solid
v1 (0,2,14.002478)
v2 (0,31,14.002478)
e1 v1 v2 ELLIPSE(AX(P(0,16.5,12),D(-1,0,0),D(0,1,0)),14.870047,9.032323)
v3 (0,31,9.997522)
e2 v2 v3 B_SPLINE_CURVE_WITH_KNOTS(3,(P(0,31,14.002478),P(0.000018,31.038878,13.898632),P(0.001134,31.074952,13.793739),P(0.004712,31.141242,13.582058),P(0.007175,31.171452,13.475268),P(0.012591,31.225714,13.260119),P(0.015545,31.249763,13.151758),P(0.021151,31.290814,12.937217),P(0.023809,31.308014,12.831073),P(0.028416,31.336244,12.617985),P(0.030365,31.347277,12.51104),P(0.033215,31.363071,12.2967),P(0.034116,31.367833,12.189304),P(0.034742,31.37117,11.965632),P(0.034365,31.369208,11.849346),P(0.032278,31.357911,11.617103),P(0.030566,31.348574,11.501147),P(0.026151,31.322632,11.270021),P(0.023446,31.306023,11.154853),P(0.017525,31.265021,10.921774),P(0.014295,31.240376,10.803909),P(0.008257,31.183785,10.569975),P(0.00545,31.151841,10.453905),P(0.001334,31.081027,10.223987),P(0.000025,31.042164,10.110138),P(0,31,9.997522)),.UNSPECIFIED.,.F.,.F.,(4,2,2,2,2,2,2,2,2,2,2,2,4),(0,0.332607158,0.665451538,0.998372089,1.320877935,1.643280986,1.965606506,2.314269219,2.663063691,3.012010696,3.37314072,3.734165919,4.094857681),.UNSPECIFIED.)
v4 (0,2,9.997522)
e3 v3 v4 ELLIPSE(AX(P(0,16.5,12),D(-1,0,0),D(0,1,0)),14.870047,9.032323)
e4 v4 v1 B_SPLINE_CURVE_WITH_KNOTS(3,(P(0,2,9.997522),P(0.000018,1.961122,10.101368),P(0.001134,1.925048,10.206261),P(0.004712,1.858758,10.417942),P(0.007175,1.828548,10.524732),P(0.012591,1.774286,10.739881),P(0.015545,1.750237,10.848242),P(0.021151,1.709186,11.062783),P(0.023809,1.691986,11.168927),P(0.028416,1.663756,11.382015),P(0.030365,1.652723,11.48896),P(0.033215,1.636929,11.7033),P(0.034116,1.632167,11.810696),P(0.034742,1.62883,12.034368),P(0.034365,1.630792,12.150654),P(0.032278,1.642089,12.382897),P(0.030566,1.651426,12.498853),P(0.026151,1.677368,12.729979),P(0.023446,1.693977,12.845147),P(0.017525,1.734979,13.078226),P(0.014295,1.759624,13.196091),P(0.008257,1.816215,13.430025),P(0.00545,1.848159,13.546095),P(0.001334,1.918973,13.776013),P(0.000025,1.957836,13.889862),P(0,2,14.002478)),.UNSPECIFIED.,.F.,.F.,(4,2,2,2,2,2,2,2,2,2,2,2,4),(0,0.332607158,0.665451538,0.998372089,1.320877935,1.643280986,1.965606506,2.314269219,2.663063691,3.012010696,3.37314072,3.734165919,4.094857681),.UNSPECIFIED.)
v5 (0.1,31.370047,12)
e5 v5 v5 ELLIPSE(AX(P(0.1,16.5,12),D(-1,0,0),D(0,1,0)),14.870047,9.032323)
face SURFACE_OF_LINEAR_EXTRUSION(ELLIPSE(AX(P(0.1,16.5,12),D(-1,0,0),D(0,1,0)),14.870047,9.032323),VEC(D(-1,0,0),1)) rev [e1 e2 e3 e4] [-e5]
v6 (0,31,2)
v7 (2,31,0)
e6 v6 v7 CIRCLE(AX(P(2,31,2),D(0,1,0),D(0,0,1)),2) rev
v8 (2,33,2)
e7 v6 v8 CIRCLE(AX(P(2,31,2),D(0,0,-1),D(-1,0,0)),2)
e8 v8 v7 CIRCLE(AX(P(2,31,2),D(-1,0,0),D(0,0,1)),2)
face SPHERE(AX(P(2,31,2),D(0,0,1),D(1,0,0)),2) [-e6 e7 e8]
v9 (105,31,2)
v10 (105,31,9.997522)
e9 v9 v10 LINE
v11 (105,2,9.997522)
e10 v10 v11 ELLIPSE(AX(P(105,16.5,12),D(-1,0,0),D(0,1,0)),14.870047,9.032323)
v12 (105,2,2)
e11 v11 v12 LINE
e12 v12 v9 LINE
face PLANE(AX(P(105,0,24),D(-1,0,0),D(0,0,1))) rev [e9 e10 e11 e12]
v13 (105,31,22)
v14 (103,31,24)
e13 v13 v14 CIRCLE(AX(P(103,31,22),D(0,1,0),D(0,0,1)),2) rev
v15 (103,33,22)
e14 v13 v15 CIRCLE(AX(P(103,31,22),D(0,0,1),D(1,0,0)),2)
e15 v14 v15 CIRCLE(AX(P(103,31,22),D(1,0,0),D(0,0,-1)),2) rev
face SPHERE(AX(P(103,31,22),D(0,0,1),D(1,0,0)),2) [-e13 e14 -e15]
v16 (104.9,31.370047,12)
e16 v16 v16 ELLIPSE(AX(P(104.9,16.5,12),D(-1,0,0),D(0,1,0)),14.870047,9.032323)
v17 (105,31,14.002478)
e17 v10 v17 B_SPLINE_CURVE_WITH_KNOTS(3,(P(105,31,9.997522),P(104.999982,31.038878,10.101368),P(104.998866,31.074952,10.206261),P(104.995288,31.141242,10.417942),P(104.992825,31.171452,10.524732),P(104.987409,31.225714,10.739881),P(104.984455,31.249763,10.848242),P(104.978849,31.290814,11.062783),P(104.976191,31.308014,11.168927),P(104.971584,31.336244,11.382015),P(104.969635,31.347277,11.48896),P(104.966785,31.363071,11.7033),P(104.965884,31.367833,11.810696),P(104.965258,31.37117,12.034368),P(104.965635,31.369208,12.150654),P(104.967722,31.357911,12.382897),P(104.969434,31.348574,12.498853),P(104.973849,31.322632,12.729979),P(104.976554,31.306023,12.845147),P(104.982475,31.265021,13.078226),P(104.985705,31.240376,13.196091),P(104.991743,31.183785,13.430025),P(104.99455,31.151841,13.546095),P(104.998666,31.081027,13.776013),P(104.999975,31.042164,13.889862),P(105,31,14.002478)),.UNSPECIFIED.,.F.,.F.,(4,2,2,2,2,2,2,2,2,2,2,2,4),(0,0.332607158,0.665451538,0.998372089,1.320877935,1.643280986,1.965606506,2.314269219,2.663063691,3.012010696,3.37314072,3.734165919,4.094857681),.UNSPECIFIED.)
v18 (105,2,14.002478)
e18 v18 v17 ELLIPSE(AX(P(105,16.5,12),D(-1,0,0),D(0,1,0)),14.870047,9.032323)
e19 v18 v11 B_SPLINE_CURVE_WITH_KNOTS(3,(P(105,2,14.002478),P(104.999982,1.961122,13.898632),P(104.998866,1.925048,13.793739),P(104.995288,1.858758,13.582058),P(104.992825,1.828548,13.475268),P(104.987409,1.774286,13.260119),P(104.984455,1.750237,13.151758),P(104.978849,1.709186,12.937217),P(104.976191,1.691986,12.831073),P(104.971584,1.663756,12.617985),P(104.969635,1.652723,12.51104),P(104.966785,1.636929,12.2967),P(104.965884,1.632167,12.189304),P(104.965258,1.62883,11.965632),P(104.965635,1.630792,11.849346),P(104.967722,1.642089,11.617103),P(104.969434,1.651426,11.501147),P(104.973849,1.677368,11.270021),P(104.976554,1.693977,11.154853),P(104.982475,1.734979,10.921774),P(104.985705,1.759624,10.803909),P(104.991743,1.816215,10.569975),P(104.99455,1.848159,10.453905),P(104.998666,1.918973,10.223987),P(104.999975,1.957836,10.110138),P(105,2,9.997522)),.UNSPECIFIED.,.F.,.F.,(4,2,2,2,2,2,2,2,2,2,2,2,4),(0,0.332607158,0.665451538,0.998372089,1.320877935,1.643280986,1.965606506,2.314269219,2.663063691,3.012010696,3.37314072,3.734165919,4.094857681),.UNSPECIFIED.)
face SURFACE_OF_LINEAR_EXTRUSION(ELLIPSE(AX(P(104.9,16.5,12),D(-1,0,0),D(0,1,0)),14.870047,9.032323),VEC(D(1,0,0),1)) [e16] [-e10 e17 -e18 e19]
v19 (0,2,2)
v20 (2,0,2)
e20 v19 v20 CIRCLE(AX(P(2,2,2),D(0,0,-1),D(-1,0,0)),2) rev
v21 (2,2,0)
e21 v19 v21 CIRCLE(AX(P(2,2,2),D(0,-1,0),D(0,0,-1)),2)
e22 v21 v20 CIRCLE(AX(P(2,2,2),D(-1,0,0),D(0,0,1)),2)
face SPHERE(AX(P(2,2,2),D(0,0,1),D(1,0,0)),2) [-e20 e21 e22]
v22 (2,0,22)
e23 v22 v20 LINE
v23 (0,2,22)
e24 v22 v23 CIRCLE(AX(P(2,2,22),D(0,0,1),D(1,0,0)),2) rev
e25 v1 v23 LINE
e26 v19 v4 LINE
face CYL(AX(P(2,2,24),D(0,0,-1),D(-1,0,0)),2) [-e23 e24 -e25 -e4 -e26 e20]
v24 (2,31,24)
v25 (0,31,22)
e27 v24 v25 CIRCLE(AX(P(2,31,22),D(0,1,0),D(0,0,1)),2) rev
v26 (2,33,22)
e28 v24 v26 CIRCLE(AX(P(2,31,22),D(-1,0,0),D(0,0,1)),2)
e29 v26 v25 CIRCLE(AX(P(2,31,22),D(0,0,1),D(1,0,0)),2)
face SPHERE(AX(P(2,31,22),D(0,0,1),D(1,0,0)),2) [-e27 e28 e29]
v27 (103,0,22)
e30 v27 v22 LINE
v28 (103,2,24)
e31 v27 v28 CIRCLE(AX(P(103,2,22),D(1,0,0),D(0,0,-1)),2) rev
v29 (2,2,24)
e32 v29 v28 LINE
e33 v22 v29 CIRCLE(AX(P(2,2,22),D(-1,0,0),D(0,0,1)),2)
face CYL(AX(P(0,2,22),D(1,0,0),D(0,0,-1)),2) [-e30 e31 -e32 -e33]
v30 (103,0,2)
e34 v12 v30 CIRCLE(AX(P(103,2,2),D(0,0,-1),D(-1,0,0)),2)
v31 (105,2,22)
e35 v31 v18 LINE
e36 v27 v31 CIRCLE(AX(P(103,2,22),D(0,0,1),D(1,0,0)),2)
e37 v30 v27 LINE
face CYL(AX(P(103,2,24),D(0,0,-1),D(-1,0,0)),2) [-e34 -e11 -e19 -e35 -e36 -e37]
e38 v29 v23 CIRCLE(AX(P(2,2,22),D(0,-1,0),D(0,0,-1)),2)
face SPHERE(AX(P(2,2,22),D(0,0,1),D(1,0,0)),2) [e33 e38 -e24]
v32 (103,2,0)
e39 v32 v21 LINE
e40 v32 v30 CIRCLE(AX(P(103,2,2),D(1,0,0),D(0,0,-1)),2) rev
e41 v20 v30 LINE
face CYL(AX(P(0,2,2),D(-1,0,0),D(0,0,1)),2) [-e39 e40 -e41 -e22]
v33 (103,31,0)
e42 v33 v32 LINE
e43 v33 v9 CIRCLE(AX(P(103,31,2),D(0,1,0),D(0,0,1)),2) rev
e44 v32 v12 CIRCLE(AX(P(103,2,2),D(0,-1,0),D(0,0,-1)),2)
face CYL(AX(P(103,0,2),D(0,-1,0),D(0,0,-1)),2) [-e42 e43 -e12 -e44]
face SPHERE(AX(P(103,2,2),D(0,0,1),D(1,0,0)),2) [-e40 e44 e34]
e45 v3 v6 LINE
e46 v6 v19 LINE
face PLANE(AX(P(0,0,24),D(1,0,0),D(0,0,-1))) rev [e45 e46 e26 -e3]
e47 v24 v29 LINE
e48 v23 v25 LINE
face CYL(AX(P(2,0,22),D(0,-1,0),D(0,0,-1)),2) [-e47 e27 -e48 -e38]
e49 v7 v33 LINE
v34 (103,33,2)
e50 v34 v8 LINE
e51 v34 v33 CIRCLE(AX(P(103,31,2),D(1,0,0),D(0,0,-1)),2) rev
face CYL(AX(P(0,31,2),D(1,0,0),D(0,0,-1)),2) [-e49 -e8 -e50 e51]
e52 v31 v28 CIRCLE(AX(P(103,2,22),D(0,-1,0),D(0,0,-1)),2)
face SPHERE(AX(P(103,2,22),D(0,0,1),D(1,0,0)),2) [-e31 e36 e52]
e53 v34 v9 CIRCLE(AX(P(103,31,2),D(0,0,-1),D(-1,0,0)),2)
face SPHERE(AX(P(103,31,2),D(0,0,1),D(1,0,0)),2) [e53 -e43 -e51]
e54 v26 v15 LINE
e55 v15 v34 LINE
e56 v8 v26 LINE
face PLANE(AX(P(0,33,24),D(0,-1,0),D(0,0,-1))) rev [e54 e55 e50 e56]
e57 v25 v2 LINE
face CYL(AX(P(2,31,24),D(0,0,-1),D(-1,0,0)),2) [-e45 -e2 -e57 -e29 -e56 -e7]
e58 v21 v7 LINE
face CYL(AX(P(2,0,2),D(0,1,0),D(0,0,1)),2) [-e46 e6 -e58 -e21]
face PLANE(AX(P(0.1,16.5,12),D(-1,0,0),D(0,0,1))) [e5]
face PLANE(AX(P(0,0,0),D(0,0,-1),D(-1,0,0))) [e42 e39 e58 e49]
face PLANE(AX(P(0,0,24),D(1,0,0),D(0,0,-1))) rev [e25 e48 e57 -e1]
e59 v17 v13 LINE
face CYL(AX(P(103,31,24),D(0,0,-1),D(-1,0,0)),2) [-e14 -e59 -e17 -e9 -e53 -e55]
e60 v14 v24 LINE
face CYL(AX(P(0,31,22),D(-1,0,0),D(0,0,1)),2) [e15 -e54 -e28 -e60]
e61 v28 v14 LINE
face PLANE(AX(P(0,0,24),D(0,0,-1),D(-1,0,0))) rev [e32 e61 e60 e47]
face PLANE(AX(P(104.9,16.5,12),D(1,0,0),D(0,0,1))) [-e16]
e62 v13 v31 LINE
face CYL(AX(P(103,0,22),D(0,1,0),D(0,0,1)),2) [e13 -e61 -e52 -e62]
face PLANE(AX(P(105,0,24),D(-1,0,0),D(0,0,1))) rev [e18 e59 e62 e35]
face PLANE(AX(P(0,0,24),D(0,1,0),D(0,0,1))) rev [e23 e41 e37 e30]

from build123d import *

# Parameters (mm, degrees)
ESQUISSE1_W             = 105
ESQUISSE1_H             = 33
BOSS_EXTRU_1_DEPTH      = 24
ESQUISSE2_RX            = 14.870046763
ESQUISSE2_RY            = 9.032322921
ENL_V_MAT_EXTRU_1_DEPTH = 0.1
CONG_1_R                = 2


with BuildPart() as part:
    # Esquisse1 → Boss.-Extru.1 (new body)
    with BuildSketch(Plane.XY):
        with Locations((52.5, 16.5)):
            Rectangle(ESQUISSE1_W, ESQUISSE1_H)
    extrude(amount=BOSS_EXTRU_1_DEPTH)

    # Esquisse2 → Enlèv. mat.-Extru.1 (cut)
    with BuildSketch(Plane.ZY):
        with Locations(Location((12, 16.5), (0, 0, 90))):
            Ellipse(ESQUISSE2_RX, ESQUISSE2_RY)
    enl_v_mat_extru_1 = extrude(amount=-ENL_V_MAT_EXTRU_1_DEPTH, mode=Mode.SUBTRACT)

    # Symétrie1: Enlèv. mat.-Extru.1 across plane
    add(enl_v_mat_extru_1.mirror(Plane.ZY.offset(-52.5)), mode=Mode.SUBTRACT)

    # Congé1
    # the kernel refuses this fillet: 2 mm, written as the material it takes off along each edge
    with BuildSketch(Plane(origin=(103, 2, 22), x_dir=(1, 0, 0), z_dir=(0, -1, 0))) as cong_1_piece_1_section:
        Polygon((0, 0), (CONG_1_R, 0), (CONG_1_R, CONG_1_R), (0, CONG_1_R), align=None)
    cong_1_piece_1 = extrude(amount=CONG_1_R, mode=Mode.PRIVATE)
    cong_1_piece_1 = cong_1_piece_1 - Plane(origin=(103, 2, 22), x_dir=(-0.7071067811865475, 0, -0.7071067811865475), z_dir=(0, -1, 0)) * Sphere(CONG_1_R, mode=Mode.PRIVATE)
    add(cong_1_piece_1, mode=Mode.SUBTRACT)
    with BuildSketch(Plane(origin=(103, 31, 22), x_dir=(0, 0, 1), z_dir=(1, 0, 0))) as cong_1_piece_2_section:
        Polygon((0, 0), (CONG_1_R, 0), (CONG_1_R, -CONG_1_R), (0, -CONG_1_R), align=None)
    cong_1_piece_2 = extrude(amount=CONG_1_R, mode=Mode.PRIVATE)
    cong_1_piece_2 = cong_1_piece_2 - Plane(origin=(103, 31, 22), x_dir=(0, -0.7071067811865475, -0.7071067811865475), z_dir=(1, 0, 0)) * Sphere(CONG_1_R, mode=Mode.PRIVATE)
    add(cong_1_piece_2, mode=Mode.SUBTRACT)
    with BuildSketch(Plane(origin=(2, 31, 22), x_dir=(0, 0, 1), z_dir=(-1, 0, 0))) as cong_1_piece_3_section:
        Polygon((0, 0), (CONG_1_R, 0), (CONG_1_R, CONG_1_R), (0, CONG_1_R), align=None)
    cong_1_piece_3 = extrude(amount=CONG_1_R, mode=Mode.PRIVATE)
    cong_1_piece_3 = cong_1_piece_3 - Plane(origin=(2, 31, 22), x_dir=(0, -0.7071067811865475, -0.7071067811865475), z_dir=(-1, 0, 0)) * Sphere(CONG_1_R, mode=Mode.PRIVATE)
    add(cong_1_piece_3, mode=Mode.SUBTRACT)
    with BuildSketch(Plane(origin=(2, 2, 22), x_dir=(-1, 0, 0), z_dir=(0, -1, 0))) as cong_1_piece_4_section:
        Polygon((0, 0), (CONG_1_R, 0), (CONG_1_R, -CONG_1_R), (0, -CONG_1_R), align=None)
    cong_1_piece_4 = extrude(amount=CONG_1_R, mode=Mode.PRIVATE)
    cong_1_piece_4 = cong_1_piece_4 - Plane(origin=(2, 2, 22), x_dir=(0.7071067811865475, 0, -0.7071067811865475), z_dir=(0, -1, 0)) * Sphere(CONG_1_R, mode=Mode.PRIVATE)
    add(cong_1_piece_4, mode=Mode.SUBTRACT)
    with BuildSketch(Plane(origin=(103, 31, 2), x_dir=(0, 0, -1), z_dir=(1, 0, 0))) as cong_1_piece_5_section:
        Polygon((0, 0), (CONG_1_R, 0), (CONG_1_R, CONG_1_R), (0, CONG_1_R), align=None)
    cong_1_piece_5 = extrude(amount=CONG_1_R, mode=Mode.PRIVATE)
    cong_1_piece_5 = cong_1_piece_5 - Plane(origin=(103, 31, 2), x_dir=(0, -0.7071067811865475, 0.7071067811865475), z_dir=(1, 0, 0)) * Sphere(CONG_1_R, mode=Mode.PRIVATE)
    add(cong_1_piece_5, mode=Mode.SUBTRACT)
    with BuildSketch(Plane(origin=(2, 31, 2), x_dir=(0, 0, -1), z_dir=(-1, 0, 0))) as cong_1_piece_6_section:
        Polygon((0, 0), (CONG_1_R, 0), (CONG_1_R, -CONG_1_R), (0, -CONG_1_R), align=None)
    cong_1_piece_6 = extrude(amount=CONG_1_R, mode=Mode.PRIVATE)
    cong_1_piece_6 = cong_1_piece_6 - Plane(origin=(2, 31, 2), x_dir=(0, -0.7071067811865475, 0.7071067811865475), z_dir=(-1, 0, 0)) * Sphere(CONG_1_R, mode=Mode.PRIVATE)
    add(cong_1_piece_6, mode=Mode.SUBTRACT)
    with BuildSketch(Plane(origin=(103, 2, 2), x_dir=(1, 0, 0), z_dir=(0, -1, 0))) as cong_1_piece_7_section:
        Polygon((0, 0), (CONG_1_R, 0), (CONG_1_R, -CONG_1_R), (0, -CONG_1_R), align=None)
    cong_1_piece_7 = extrude(amount=CONG_1_R, mode=Mode.PRIVATE)
    cong_1_piece_7 = cong_1_piece_7 - Plane(origin=(103, 2, 2), x_dir=(-0.7071067811865475, 0, 0.7071067811865475), z_dir=(0, -1, 0)) * Sphere(CONG_1_R, mode=Mode.PRIVATE)
    add(cong_1_piece_7, mode=Mode.SUBTRACT)
    with BuildSketch(Plane(origin=(2, 2, 2), x_dir=(-1, 0, 0), z_dir=(0, -1, 0))) as cong_1_piece_8_section:
        Polygon((0, 0), (CONG_1_R, 0), (CONG_1_R, CONG_1_R), (0, CONG_1_R), align=None)
    cong_1_piece_8 = extrude(amount=CONG_1_R, mode=Mode.PRIVATE)
    cong_1_piece_8 = cong_1_piece_8 - Plane(origin=(2, 2, 2), x_dir=(0.7071067811865475, 0, 0.7071067811865475), z_dir=(0, -1, 0)) * Sphere(CONG_1_R, mode=Mode.PRIVATE)
    add(cong_1_piece_8, mode=Mode.SUBTRACT)
    with BuildSketch(Plane(origin=(105, 2, 24), x_dir=(0, 0, -1), z_dir=(0, 1, 0)), Plane(origin=(0, 31, 24), x_dir=(0, 0, -1), z_dir=(0, -1, 0))) as cong_1_piece_9:
        with BuildLine():
            CenterArc((CONG_1_R, CONG_1_R), CONG_1_R, 180, 90)
            Line((0, CONG_1_R), (0, 0))
            Line((0, 0), (CONG_1_R, 0))
        make_face()
    extrude(amount=29, mode=Mode.SUBTRACT)
    with BuildSketch(Plane(origin=(103, 33, 24), x_dir=(0, -1, 0), z_dir=(-1, 0, 0)), Plane(origin=(2, 0, 0), x_dir=(0, 0, 1), z_dir=(1, 0, 0))) as cong_1_piece_10:
        with BuildLine():
            CenterArc((CONG_1_R, -CONG_1_R), CONG_1_R, 90, 90)
            Line((0, -CONG_1_R), (0, 0))
            Line((0, 0), (CONG_1_R, 0))
        make_face()
    extrude(amount=101, mode=Mode.SUBTRACT)
    with BuildSketch(Plane(origin=(103, 33, 0), x_dir=(0, -1, 0), z_dir=(-1, 0, 0)), Plane(origin=(2, 0, 24), x_dir=(0, 0, -1), z_dir=(1, 0, 0))) as cong_1_piece_11:
        with BuildLine():
            CenterArc((CONG_1_R, CONG_1_R), CONG_1_R, 180, 90)
            Line((0, CONG_1_R), (0, 0))
            Line((0, 0), (CONG_1_R, 0))
        make_face()
    extrude(amount=101, mode=Mode.SUBTRACT)
    with BuildSketch(Plane(origin=(105, 2, 0), x_dir=(0, 0, 1), z_dir=(0, 1, 0)), Plane(origin=(0, 31, 0), x_dir=(0, 0, 1), z_dir=(0, -1, 0))) as cong_1_piece_12:
        with BuildLine():
            CenterArc((CONG_1_R, -CONG_1_R), CONG_1_R, 90, 90)
            Line((0, -CONG_1_R), (0, 0))
            Line((0, 0), (CONG_1_R, 0))
        make_face()
    extrude(amount=29, mode=Mode.SUBTRACT)
    with BuildSketch(Plane(origin=(0, 33, 2), x_dir=(0, -1, 0), z_dir=(0, 0, 1)), Plane(origin=(0, 0, 2), x_dir=(1, 0, 0), z_dir=(0, 0, 1))) as cong_1_piece_13:
        with BuildLine():
            CenterArc((CONG_1_R, CONG_1_R), CONG_1_R, 180, 90)
            Line((0, CONG_1_R), (0, 0))
            Line((0, 0), (CONG_1_R, 0))
        make_face()
    extrude(amount=20, mode=Mode.SUBTRACT)
    with BuildSketch(Plane(origin=(105, 33, 2), x_dir=(0, -1, 0), z_dir=(0, 0, 1)), Plane(origin=(105, 0, 2), x_dir=(-1, 0, 0), z_dir=(0, 0, 1))) as cong_1_piece_14:
        with BuildLine():
            CenterArc((CONG_1_R, -CONG_1_R), CONG_1_R, 90, 90)
            Line((0, -CONG_1_R), (0, 0))
            Line((0, 0), (CONG_1_R, 0))
        make_face()
    extrude(amount=20, mode=Mode.SUBTRACT)


solid = part.part
